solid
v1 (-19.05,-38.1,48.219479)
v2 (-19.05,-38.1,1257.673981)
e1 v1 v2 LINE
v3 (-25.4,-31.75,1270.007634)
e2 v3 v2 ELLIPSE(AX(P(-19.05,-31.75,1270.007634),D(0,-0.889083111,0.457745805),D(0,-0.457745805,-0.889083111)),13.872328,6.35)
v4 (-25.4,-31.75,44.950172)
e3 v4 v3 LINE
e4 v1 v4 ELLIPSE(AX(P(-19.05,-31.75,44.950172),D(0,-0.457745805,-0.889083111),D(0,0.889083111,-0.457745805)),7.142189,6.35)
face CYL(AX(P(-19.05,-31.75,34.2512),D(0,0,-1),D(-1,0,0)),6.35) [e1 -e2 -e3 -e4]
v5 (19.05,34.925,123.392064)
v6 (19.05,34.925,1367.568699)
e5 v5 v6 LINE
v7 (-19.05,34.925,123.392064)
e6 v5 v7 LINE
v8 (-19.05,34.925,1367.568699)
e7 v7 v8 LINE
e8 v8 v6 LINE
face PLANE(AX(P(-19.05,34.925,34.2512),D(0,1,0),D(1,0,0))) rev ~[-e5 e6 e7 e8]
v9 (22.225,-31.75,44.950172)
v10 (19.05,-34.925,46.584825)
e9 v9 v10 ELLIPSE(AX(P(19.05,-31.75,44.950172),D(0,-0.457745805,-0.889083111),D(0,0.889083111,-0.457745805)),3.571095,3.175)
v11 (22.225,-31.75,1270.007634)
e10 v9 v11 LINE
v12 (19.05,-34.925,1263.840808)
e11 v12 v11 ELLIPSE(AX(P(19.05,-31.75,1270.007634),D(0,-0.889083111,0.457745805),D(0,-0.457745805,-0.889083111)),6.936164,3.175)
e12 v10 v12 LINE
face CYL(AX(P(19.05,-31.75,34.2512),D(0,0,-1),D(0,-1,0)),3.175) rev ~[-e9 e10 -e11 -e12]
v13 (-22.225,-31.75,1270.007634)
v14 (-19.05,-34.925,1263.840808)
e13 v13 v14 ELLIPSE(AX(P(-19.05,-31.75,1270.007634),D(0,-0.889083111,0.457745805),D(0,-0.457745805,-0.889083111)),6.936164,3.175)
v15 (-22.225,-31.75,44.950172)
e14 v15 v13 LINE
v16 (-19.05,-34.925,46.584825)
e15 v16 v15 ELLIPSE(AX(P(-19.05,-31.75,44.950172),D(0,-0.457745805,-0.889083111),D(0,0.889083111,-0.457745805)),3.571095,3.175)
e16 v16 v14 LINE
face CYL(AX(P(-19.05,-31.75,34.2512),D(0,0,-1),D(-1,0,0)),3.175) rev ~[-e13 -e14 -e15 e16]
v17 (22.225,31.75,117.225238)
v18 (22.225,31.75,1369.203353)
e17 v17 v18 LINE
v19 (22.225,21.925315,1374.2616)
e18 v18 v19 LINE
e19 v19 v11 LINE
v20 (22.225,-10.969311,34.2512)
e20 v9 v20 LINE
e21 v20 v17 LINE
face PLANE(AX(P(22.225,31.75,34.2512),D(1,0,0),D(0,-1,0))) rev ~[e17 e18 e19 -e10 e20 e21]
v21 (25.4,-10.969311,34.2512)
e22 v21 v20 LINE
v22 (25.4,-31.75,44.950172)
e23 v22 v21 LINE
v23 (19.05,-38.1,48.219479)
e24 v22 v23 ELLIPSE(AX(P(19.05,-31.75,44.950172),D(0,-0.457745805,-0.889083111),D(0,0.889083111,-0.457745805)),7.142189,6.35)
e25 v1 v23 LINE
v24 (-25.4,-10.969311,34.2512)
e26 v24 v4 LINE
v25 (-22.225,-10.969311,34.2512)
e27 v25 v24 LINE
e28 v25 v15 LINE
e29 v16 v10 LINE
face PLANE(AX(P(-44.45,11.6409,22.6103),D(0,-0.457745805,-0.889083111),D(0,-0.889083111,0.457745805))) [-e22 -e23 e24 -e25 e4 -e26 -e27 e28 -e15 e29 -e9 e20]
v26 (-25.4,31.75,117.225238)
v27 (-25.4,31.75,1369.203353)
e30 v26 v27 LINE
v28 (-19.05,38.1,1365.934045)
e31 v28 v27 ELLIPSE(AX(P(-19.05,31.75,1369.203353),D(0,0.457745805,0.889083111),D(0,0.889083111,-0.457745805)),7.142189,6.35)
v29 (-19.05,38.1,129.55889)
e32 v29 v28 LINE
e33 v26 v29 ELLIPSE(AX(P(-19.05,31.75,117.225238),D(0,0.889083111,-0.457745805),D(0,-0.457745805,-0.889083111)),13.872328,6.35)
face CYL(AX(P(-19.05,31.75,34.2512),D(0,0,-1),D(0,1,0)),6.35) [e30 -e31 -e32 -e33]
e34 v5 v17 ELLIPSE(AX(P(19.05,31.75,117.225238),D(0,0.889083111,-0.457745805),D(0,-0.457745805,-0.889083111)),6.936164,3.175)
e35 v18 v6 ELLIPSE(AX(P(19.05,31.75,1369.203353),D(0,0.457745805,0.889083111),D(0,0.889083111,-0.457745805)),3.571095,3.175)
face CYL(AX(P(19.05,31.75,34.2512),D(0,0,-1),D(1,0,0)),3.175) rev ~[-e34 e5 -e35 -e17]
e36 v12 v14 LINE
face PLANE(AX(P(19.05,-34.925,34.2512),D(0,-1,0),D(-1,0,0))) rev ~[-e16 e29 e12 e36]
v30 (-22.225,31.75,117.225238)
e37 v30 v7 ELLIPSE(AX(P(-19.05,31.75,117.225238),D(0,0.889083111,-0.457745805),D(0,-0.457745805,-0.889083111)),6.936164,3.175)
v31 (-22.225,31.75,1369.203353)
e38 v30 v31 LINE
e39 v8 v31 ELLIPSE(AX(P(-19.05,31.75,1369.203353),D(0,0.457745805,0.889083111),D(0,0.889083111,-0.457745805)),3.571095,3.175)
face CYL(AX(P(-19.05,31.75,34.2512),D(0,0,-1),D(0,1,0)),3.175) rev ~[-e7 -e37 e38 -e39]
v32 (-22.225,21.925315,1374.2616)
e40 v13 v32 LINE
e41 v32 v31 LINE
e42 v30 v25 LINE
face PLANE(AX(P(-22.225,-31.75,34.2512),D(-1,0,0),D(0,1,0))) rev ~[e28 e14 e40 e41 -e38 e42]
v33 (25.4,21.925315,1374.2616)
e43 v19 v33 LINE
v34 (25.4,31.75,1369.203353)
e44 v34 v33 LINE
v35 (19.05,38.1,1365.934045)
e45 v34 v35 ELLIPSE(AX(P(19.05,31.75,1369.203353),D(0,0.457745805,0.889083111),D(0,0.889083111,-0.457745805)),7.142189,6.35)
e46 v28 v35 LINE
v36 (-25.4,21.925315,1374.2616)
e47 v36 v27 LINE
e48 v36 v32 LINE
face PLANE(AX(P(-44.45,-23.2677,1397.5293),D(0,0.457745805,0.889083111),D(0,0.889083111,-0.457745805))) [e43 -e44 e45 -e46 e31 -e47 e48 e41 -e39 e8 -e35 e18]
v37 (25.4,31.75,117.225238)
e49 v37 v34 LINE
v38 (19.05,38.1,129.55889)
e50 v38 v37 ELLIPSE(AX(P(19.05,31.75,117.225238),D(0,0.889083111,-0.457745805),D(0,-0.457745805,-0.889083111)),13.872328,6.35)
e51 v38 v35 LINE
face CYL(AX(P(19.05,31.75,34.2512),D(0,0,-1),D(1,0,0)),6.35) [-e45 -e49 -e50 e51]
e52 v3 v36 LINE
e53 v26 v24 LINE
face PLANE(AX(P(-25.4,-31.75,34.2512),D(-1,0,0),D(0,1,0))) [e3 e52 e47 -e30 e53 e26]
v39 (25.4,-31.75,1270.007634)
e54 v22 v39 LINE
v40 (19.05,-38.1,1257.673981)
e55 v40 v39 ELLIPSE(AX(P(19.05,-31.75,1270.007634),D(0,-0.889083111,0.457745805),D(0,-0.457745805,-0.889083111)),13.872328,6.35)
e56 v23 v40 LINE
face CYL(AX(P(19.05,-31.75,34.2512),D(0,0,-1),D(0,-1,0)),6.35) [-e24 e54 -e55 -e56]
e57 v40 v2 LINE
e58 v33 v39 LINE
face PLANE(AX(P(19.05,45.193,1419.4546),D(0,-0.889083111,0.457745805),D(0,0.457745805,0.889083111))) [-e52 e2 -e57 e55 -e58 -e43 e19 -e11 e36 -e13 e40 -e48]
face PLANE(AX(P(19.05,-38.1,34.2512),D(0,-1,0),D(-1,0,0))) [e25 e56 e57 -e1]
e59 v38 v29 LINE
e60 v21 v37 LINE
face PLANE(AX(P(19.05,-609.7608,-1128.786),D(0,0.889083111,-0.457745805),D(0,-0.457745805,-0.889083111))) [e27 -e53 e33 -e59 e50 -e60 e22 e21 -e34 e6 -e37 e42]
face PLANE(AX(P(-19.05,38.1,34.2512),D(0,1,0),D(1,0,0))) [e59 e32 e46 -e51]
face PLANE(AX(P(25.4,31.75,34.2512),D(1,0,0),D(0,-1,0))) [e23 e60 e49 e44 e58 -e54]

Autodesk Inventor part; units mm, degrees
ref_plane "Start Plane" through (0, 0, 34.2512) normal (0, 0, 1) x (1, 0, 0)
ref_plane "End Plane" through (0, 0, 1374.2616) normal (0, 0, 1) x (1, 0, 0)
sketch "Sketch" plane through (0, 0, 0) normal (0, 0, 1) x (1, 0, 0)
  line L0 (-25.4, -31.75) -> (-25.4, 31.75)
  line L1 (-19.05, 38.1) -> (19.05, 38.1)
  line L2 (25.4, 31.75) -> (25.4, -31.75)
  line L3 (19.05, -38.1) -> (-19.05, -38.1)
  arc A0 (-25.4, -31.75) -> (-19.05, -38.1) centre (-19.05, -31.75) ccw
  arc A1 (-19.05, 38.1) -> (-25.4, 31.75) centre (-19.05, 31.75) ccw
  arc A2 (25.4, 31.75) -> (19.05, 38.1) centre (19.05, 31.75) ccw
  arc A3 (19.05, -38.1) -> (25.4, -31.75) centre (19.05, -31.75) ccw
  arc A4 (-19.05, 34.925) -> (-22.225, 31.75) centre (-19.05, 31.75) ccw
  line L4 (-19.05, 34.925) -> (19.05, 34.925)
  arc A5 (22.225, 31.75) -> (19.05, 34.925) centre (19.05, 31.75) ccw
  line L5 (22.225, 31.75) -> (22.225, -31.75)
  arc A6 (19.05, -34.925) -> (22.225, -31.75) centre (19.05, -31.75) ccw
  line L6 (19.05, -34.925) -> (-19.05, -34.925)
  arc A7 (-22.225, -31.75) -> (-19.05, -34.925) centre (-19.05, -31.75) ccw
  line L7 (-22.225, -31.75) -> (-22.225, 31.75)
  line L8 (0, 55.1812) -> (0, -55.1812) construction
  line L9 (-37.4012, 0) -> (37.4012, 0) construction
  dimension "d10" = 76.2
  dimension "d11" = 50.8
  dimension "d12" = 3.175
  dimension "d15" = 38.1
  dimension "d16" = 25.4
  dimension "d17" = 6.35
extrude "Body" add sketch "Sketch" along normal up to surface (1340.0104 mm away) from surface at 34.2512
sketch "Sketch3" plane through (0, 0, 0) normal (0, 0, 1) x (1, 0, 0)
  line L0 (0, 0) -> (10, 0)
ref_plane "Work Plane3" through (0, 0, 0) normal (0, -1, 0) x (1, 0, 0)
ref_plane "Work Plane8" through (19.05, -609.7608, -1128.786) normal (0, 0.8890831, -0.4577458) x (1, 0, 0)
split "Split5" plane through (19.05, -609.7608, -1128.786) removes the side toward (0, 0.8890831, -0.4577458)
ref_plane "Work Plane9" through (-44.45, 11.6409, 22.6103) normal (0, -0.4577458, -0.8890831) x (1, 0, 0)
split "Split6" plane through (-44.45, 11.6409, 22.6103) removes the side toward (0, -0.4577458, -0.8890831)
ref_plane "Work Plane10" through (19.05, 45.193, 1419.4546) normal (0, -0.8890831, 0.4577458) x (1, 0, 0)
split "Split7" plane through (19.05, 45.193, 1419.4546) removes the side toward (0, -0.8890831, 0.4577458)
ref_plane "Work Plane11" through (-44.45, -23.2677, 1397.5293) normal (0, 0.4577458, 0.8890831) x (1, 0, 0)
split "Split8" plane through (-44.45, -23.2677, 1397.5293) removes the side toward (0, 0.4577458, 0.8890831)
sketch "Sketch4" plane through (0, 0, 0) normal (0, -1, 0) x (1, 0, 0)
  line L0 (-2, 34.2512) -> (12, 34.2512) projected
  line L1 (-2, 1374.2616) -> (12, 1374.2616) projected
  dimension "d19" = 1340.0104
equation "\"d10\" = G_H"
equation "\"d11\" = G_W"
equation "\"d12\" = G_T"
equation "\"d15\" = 0.5 * d10"
equation "\"d16\" = 0.5 * d11"
equation "\"d17\" = G_IR"
equation "\"d3\" = G_L"
equation "\"G_W\" = 50.8"
equation "\"G_H\" = 76.2"
equation "\"G_T\" = 3.175"
equation "\"G_IR\" = 6.35"
equation "\"G_L\" = d19"
equation "\"G_OFFSET_START\" = -34.25121"
equation "\"G_OFFSET_END\" = -68.46066"
equation "\"d13\" = -G_OFFSET_START"
equation "\"d14\" = G_OFFSET_END + B_L"
equation "\"B_L\" = 1442.72224"
properties part number "AISC - 3 x 2 x 1/8 - 52.756" material "Steel, Mild"
